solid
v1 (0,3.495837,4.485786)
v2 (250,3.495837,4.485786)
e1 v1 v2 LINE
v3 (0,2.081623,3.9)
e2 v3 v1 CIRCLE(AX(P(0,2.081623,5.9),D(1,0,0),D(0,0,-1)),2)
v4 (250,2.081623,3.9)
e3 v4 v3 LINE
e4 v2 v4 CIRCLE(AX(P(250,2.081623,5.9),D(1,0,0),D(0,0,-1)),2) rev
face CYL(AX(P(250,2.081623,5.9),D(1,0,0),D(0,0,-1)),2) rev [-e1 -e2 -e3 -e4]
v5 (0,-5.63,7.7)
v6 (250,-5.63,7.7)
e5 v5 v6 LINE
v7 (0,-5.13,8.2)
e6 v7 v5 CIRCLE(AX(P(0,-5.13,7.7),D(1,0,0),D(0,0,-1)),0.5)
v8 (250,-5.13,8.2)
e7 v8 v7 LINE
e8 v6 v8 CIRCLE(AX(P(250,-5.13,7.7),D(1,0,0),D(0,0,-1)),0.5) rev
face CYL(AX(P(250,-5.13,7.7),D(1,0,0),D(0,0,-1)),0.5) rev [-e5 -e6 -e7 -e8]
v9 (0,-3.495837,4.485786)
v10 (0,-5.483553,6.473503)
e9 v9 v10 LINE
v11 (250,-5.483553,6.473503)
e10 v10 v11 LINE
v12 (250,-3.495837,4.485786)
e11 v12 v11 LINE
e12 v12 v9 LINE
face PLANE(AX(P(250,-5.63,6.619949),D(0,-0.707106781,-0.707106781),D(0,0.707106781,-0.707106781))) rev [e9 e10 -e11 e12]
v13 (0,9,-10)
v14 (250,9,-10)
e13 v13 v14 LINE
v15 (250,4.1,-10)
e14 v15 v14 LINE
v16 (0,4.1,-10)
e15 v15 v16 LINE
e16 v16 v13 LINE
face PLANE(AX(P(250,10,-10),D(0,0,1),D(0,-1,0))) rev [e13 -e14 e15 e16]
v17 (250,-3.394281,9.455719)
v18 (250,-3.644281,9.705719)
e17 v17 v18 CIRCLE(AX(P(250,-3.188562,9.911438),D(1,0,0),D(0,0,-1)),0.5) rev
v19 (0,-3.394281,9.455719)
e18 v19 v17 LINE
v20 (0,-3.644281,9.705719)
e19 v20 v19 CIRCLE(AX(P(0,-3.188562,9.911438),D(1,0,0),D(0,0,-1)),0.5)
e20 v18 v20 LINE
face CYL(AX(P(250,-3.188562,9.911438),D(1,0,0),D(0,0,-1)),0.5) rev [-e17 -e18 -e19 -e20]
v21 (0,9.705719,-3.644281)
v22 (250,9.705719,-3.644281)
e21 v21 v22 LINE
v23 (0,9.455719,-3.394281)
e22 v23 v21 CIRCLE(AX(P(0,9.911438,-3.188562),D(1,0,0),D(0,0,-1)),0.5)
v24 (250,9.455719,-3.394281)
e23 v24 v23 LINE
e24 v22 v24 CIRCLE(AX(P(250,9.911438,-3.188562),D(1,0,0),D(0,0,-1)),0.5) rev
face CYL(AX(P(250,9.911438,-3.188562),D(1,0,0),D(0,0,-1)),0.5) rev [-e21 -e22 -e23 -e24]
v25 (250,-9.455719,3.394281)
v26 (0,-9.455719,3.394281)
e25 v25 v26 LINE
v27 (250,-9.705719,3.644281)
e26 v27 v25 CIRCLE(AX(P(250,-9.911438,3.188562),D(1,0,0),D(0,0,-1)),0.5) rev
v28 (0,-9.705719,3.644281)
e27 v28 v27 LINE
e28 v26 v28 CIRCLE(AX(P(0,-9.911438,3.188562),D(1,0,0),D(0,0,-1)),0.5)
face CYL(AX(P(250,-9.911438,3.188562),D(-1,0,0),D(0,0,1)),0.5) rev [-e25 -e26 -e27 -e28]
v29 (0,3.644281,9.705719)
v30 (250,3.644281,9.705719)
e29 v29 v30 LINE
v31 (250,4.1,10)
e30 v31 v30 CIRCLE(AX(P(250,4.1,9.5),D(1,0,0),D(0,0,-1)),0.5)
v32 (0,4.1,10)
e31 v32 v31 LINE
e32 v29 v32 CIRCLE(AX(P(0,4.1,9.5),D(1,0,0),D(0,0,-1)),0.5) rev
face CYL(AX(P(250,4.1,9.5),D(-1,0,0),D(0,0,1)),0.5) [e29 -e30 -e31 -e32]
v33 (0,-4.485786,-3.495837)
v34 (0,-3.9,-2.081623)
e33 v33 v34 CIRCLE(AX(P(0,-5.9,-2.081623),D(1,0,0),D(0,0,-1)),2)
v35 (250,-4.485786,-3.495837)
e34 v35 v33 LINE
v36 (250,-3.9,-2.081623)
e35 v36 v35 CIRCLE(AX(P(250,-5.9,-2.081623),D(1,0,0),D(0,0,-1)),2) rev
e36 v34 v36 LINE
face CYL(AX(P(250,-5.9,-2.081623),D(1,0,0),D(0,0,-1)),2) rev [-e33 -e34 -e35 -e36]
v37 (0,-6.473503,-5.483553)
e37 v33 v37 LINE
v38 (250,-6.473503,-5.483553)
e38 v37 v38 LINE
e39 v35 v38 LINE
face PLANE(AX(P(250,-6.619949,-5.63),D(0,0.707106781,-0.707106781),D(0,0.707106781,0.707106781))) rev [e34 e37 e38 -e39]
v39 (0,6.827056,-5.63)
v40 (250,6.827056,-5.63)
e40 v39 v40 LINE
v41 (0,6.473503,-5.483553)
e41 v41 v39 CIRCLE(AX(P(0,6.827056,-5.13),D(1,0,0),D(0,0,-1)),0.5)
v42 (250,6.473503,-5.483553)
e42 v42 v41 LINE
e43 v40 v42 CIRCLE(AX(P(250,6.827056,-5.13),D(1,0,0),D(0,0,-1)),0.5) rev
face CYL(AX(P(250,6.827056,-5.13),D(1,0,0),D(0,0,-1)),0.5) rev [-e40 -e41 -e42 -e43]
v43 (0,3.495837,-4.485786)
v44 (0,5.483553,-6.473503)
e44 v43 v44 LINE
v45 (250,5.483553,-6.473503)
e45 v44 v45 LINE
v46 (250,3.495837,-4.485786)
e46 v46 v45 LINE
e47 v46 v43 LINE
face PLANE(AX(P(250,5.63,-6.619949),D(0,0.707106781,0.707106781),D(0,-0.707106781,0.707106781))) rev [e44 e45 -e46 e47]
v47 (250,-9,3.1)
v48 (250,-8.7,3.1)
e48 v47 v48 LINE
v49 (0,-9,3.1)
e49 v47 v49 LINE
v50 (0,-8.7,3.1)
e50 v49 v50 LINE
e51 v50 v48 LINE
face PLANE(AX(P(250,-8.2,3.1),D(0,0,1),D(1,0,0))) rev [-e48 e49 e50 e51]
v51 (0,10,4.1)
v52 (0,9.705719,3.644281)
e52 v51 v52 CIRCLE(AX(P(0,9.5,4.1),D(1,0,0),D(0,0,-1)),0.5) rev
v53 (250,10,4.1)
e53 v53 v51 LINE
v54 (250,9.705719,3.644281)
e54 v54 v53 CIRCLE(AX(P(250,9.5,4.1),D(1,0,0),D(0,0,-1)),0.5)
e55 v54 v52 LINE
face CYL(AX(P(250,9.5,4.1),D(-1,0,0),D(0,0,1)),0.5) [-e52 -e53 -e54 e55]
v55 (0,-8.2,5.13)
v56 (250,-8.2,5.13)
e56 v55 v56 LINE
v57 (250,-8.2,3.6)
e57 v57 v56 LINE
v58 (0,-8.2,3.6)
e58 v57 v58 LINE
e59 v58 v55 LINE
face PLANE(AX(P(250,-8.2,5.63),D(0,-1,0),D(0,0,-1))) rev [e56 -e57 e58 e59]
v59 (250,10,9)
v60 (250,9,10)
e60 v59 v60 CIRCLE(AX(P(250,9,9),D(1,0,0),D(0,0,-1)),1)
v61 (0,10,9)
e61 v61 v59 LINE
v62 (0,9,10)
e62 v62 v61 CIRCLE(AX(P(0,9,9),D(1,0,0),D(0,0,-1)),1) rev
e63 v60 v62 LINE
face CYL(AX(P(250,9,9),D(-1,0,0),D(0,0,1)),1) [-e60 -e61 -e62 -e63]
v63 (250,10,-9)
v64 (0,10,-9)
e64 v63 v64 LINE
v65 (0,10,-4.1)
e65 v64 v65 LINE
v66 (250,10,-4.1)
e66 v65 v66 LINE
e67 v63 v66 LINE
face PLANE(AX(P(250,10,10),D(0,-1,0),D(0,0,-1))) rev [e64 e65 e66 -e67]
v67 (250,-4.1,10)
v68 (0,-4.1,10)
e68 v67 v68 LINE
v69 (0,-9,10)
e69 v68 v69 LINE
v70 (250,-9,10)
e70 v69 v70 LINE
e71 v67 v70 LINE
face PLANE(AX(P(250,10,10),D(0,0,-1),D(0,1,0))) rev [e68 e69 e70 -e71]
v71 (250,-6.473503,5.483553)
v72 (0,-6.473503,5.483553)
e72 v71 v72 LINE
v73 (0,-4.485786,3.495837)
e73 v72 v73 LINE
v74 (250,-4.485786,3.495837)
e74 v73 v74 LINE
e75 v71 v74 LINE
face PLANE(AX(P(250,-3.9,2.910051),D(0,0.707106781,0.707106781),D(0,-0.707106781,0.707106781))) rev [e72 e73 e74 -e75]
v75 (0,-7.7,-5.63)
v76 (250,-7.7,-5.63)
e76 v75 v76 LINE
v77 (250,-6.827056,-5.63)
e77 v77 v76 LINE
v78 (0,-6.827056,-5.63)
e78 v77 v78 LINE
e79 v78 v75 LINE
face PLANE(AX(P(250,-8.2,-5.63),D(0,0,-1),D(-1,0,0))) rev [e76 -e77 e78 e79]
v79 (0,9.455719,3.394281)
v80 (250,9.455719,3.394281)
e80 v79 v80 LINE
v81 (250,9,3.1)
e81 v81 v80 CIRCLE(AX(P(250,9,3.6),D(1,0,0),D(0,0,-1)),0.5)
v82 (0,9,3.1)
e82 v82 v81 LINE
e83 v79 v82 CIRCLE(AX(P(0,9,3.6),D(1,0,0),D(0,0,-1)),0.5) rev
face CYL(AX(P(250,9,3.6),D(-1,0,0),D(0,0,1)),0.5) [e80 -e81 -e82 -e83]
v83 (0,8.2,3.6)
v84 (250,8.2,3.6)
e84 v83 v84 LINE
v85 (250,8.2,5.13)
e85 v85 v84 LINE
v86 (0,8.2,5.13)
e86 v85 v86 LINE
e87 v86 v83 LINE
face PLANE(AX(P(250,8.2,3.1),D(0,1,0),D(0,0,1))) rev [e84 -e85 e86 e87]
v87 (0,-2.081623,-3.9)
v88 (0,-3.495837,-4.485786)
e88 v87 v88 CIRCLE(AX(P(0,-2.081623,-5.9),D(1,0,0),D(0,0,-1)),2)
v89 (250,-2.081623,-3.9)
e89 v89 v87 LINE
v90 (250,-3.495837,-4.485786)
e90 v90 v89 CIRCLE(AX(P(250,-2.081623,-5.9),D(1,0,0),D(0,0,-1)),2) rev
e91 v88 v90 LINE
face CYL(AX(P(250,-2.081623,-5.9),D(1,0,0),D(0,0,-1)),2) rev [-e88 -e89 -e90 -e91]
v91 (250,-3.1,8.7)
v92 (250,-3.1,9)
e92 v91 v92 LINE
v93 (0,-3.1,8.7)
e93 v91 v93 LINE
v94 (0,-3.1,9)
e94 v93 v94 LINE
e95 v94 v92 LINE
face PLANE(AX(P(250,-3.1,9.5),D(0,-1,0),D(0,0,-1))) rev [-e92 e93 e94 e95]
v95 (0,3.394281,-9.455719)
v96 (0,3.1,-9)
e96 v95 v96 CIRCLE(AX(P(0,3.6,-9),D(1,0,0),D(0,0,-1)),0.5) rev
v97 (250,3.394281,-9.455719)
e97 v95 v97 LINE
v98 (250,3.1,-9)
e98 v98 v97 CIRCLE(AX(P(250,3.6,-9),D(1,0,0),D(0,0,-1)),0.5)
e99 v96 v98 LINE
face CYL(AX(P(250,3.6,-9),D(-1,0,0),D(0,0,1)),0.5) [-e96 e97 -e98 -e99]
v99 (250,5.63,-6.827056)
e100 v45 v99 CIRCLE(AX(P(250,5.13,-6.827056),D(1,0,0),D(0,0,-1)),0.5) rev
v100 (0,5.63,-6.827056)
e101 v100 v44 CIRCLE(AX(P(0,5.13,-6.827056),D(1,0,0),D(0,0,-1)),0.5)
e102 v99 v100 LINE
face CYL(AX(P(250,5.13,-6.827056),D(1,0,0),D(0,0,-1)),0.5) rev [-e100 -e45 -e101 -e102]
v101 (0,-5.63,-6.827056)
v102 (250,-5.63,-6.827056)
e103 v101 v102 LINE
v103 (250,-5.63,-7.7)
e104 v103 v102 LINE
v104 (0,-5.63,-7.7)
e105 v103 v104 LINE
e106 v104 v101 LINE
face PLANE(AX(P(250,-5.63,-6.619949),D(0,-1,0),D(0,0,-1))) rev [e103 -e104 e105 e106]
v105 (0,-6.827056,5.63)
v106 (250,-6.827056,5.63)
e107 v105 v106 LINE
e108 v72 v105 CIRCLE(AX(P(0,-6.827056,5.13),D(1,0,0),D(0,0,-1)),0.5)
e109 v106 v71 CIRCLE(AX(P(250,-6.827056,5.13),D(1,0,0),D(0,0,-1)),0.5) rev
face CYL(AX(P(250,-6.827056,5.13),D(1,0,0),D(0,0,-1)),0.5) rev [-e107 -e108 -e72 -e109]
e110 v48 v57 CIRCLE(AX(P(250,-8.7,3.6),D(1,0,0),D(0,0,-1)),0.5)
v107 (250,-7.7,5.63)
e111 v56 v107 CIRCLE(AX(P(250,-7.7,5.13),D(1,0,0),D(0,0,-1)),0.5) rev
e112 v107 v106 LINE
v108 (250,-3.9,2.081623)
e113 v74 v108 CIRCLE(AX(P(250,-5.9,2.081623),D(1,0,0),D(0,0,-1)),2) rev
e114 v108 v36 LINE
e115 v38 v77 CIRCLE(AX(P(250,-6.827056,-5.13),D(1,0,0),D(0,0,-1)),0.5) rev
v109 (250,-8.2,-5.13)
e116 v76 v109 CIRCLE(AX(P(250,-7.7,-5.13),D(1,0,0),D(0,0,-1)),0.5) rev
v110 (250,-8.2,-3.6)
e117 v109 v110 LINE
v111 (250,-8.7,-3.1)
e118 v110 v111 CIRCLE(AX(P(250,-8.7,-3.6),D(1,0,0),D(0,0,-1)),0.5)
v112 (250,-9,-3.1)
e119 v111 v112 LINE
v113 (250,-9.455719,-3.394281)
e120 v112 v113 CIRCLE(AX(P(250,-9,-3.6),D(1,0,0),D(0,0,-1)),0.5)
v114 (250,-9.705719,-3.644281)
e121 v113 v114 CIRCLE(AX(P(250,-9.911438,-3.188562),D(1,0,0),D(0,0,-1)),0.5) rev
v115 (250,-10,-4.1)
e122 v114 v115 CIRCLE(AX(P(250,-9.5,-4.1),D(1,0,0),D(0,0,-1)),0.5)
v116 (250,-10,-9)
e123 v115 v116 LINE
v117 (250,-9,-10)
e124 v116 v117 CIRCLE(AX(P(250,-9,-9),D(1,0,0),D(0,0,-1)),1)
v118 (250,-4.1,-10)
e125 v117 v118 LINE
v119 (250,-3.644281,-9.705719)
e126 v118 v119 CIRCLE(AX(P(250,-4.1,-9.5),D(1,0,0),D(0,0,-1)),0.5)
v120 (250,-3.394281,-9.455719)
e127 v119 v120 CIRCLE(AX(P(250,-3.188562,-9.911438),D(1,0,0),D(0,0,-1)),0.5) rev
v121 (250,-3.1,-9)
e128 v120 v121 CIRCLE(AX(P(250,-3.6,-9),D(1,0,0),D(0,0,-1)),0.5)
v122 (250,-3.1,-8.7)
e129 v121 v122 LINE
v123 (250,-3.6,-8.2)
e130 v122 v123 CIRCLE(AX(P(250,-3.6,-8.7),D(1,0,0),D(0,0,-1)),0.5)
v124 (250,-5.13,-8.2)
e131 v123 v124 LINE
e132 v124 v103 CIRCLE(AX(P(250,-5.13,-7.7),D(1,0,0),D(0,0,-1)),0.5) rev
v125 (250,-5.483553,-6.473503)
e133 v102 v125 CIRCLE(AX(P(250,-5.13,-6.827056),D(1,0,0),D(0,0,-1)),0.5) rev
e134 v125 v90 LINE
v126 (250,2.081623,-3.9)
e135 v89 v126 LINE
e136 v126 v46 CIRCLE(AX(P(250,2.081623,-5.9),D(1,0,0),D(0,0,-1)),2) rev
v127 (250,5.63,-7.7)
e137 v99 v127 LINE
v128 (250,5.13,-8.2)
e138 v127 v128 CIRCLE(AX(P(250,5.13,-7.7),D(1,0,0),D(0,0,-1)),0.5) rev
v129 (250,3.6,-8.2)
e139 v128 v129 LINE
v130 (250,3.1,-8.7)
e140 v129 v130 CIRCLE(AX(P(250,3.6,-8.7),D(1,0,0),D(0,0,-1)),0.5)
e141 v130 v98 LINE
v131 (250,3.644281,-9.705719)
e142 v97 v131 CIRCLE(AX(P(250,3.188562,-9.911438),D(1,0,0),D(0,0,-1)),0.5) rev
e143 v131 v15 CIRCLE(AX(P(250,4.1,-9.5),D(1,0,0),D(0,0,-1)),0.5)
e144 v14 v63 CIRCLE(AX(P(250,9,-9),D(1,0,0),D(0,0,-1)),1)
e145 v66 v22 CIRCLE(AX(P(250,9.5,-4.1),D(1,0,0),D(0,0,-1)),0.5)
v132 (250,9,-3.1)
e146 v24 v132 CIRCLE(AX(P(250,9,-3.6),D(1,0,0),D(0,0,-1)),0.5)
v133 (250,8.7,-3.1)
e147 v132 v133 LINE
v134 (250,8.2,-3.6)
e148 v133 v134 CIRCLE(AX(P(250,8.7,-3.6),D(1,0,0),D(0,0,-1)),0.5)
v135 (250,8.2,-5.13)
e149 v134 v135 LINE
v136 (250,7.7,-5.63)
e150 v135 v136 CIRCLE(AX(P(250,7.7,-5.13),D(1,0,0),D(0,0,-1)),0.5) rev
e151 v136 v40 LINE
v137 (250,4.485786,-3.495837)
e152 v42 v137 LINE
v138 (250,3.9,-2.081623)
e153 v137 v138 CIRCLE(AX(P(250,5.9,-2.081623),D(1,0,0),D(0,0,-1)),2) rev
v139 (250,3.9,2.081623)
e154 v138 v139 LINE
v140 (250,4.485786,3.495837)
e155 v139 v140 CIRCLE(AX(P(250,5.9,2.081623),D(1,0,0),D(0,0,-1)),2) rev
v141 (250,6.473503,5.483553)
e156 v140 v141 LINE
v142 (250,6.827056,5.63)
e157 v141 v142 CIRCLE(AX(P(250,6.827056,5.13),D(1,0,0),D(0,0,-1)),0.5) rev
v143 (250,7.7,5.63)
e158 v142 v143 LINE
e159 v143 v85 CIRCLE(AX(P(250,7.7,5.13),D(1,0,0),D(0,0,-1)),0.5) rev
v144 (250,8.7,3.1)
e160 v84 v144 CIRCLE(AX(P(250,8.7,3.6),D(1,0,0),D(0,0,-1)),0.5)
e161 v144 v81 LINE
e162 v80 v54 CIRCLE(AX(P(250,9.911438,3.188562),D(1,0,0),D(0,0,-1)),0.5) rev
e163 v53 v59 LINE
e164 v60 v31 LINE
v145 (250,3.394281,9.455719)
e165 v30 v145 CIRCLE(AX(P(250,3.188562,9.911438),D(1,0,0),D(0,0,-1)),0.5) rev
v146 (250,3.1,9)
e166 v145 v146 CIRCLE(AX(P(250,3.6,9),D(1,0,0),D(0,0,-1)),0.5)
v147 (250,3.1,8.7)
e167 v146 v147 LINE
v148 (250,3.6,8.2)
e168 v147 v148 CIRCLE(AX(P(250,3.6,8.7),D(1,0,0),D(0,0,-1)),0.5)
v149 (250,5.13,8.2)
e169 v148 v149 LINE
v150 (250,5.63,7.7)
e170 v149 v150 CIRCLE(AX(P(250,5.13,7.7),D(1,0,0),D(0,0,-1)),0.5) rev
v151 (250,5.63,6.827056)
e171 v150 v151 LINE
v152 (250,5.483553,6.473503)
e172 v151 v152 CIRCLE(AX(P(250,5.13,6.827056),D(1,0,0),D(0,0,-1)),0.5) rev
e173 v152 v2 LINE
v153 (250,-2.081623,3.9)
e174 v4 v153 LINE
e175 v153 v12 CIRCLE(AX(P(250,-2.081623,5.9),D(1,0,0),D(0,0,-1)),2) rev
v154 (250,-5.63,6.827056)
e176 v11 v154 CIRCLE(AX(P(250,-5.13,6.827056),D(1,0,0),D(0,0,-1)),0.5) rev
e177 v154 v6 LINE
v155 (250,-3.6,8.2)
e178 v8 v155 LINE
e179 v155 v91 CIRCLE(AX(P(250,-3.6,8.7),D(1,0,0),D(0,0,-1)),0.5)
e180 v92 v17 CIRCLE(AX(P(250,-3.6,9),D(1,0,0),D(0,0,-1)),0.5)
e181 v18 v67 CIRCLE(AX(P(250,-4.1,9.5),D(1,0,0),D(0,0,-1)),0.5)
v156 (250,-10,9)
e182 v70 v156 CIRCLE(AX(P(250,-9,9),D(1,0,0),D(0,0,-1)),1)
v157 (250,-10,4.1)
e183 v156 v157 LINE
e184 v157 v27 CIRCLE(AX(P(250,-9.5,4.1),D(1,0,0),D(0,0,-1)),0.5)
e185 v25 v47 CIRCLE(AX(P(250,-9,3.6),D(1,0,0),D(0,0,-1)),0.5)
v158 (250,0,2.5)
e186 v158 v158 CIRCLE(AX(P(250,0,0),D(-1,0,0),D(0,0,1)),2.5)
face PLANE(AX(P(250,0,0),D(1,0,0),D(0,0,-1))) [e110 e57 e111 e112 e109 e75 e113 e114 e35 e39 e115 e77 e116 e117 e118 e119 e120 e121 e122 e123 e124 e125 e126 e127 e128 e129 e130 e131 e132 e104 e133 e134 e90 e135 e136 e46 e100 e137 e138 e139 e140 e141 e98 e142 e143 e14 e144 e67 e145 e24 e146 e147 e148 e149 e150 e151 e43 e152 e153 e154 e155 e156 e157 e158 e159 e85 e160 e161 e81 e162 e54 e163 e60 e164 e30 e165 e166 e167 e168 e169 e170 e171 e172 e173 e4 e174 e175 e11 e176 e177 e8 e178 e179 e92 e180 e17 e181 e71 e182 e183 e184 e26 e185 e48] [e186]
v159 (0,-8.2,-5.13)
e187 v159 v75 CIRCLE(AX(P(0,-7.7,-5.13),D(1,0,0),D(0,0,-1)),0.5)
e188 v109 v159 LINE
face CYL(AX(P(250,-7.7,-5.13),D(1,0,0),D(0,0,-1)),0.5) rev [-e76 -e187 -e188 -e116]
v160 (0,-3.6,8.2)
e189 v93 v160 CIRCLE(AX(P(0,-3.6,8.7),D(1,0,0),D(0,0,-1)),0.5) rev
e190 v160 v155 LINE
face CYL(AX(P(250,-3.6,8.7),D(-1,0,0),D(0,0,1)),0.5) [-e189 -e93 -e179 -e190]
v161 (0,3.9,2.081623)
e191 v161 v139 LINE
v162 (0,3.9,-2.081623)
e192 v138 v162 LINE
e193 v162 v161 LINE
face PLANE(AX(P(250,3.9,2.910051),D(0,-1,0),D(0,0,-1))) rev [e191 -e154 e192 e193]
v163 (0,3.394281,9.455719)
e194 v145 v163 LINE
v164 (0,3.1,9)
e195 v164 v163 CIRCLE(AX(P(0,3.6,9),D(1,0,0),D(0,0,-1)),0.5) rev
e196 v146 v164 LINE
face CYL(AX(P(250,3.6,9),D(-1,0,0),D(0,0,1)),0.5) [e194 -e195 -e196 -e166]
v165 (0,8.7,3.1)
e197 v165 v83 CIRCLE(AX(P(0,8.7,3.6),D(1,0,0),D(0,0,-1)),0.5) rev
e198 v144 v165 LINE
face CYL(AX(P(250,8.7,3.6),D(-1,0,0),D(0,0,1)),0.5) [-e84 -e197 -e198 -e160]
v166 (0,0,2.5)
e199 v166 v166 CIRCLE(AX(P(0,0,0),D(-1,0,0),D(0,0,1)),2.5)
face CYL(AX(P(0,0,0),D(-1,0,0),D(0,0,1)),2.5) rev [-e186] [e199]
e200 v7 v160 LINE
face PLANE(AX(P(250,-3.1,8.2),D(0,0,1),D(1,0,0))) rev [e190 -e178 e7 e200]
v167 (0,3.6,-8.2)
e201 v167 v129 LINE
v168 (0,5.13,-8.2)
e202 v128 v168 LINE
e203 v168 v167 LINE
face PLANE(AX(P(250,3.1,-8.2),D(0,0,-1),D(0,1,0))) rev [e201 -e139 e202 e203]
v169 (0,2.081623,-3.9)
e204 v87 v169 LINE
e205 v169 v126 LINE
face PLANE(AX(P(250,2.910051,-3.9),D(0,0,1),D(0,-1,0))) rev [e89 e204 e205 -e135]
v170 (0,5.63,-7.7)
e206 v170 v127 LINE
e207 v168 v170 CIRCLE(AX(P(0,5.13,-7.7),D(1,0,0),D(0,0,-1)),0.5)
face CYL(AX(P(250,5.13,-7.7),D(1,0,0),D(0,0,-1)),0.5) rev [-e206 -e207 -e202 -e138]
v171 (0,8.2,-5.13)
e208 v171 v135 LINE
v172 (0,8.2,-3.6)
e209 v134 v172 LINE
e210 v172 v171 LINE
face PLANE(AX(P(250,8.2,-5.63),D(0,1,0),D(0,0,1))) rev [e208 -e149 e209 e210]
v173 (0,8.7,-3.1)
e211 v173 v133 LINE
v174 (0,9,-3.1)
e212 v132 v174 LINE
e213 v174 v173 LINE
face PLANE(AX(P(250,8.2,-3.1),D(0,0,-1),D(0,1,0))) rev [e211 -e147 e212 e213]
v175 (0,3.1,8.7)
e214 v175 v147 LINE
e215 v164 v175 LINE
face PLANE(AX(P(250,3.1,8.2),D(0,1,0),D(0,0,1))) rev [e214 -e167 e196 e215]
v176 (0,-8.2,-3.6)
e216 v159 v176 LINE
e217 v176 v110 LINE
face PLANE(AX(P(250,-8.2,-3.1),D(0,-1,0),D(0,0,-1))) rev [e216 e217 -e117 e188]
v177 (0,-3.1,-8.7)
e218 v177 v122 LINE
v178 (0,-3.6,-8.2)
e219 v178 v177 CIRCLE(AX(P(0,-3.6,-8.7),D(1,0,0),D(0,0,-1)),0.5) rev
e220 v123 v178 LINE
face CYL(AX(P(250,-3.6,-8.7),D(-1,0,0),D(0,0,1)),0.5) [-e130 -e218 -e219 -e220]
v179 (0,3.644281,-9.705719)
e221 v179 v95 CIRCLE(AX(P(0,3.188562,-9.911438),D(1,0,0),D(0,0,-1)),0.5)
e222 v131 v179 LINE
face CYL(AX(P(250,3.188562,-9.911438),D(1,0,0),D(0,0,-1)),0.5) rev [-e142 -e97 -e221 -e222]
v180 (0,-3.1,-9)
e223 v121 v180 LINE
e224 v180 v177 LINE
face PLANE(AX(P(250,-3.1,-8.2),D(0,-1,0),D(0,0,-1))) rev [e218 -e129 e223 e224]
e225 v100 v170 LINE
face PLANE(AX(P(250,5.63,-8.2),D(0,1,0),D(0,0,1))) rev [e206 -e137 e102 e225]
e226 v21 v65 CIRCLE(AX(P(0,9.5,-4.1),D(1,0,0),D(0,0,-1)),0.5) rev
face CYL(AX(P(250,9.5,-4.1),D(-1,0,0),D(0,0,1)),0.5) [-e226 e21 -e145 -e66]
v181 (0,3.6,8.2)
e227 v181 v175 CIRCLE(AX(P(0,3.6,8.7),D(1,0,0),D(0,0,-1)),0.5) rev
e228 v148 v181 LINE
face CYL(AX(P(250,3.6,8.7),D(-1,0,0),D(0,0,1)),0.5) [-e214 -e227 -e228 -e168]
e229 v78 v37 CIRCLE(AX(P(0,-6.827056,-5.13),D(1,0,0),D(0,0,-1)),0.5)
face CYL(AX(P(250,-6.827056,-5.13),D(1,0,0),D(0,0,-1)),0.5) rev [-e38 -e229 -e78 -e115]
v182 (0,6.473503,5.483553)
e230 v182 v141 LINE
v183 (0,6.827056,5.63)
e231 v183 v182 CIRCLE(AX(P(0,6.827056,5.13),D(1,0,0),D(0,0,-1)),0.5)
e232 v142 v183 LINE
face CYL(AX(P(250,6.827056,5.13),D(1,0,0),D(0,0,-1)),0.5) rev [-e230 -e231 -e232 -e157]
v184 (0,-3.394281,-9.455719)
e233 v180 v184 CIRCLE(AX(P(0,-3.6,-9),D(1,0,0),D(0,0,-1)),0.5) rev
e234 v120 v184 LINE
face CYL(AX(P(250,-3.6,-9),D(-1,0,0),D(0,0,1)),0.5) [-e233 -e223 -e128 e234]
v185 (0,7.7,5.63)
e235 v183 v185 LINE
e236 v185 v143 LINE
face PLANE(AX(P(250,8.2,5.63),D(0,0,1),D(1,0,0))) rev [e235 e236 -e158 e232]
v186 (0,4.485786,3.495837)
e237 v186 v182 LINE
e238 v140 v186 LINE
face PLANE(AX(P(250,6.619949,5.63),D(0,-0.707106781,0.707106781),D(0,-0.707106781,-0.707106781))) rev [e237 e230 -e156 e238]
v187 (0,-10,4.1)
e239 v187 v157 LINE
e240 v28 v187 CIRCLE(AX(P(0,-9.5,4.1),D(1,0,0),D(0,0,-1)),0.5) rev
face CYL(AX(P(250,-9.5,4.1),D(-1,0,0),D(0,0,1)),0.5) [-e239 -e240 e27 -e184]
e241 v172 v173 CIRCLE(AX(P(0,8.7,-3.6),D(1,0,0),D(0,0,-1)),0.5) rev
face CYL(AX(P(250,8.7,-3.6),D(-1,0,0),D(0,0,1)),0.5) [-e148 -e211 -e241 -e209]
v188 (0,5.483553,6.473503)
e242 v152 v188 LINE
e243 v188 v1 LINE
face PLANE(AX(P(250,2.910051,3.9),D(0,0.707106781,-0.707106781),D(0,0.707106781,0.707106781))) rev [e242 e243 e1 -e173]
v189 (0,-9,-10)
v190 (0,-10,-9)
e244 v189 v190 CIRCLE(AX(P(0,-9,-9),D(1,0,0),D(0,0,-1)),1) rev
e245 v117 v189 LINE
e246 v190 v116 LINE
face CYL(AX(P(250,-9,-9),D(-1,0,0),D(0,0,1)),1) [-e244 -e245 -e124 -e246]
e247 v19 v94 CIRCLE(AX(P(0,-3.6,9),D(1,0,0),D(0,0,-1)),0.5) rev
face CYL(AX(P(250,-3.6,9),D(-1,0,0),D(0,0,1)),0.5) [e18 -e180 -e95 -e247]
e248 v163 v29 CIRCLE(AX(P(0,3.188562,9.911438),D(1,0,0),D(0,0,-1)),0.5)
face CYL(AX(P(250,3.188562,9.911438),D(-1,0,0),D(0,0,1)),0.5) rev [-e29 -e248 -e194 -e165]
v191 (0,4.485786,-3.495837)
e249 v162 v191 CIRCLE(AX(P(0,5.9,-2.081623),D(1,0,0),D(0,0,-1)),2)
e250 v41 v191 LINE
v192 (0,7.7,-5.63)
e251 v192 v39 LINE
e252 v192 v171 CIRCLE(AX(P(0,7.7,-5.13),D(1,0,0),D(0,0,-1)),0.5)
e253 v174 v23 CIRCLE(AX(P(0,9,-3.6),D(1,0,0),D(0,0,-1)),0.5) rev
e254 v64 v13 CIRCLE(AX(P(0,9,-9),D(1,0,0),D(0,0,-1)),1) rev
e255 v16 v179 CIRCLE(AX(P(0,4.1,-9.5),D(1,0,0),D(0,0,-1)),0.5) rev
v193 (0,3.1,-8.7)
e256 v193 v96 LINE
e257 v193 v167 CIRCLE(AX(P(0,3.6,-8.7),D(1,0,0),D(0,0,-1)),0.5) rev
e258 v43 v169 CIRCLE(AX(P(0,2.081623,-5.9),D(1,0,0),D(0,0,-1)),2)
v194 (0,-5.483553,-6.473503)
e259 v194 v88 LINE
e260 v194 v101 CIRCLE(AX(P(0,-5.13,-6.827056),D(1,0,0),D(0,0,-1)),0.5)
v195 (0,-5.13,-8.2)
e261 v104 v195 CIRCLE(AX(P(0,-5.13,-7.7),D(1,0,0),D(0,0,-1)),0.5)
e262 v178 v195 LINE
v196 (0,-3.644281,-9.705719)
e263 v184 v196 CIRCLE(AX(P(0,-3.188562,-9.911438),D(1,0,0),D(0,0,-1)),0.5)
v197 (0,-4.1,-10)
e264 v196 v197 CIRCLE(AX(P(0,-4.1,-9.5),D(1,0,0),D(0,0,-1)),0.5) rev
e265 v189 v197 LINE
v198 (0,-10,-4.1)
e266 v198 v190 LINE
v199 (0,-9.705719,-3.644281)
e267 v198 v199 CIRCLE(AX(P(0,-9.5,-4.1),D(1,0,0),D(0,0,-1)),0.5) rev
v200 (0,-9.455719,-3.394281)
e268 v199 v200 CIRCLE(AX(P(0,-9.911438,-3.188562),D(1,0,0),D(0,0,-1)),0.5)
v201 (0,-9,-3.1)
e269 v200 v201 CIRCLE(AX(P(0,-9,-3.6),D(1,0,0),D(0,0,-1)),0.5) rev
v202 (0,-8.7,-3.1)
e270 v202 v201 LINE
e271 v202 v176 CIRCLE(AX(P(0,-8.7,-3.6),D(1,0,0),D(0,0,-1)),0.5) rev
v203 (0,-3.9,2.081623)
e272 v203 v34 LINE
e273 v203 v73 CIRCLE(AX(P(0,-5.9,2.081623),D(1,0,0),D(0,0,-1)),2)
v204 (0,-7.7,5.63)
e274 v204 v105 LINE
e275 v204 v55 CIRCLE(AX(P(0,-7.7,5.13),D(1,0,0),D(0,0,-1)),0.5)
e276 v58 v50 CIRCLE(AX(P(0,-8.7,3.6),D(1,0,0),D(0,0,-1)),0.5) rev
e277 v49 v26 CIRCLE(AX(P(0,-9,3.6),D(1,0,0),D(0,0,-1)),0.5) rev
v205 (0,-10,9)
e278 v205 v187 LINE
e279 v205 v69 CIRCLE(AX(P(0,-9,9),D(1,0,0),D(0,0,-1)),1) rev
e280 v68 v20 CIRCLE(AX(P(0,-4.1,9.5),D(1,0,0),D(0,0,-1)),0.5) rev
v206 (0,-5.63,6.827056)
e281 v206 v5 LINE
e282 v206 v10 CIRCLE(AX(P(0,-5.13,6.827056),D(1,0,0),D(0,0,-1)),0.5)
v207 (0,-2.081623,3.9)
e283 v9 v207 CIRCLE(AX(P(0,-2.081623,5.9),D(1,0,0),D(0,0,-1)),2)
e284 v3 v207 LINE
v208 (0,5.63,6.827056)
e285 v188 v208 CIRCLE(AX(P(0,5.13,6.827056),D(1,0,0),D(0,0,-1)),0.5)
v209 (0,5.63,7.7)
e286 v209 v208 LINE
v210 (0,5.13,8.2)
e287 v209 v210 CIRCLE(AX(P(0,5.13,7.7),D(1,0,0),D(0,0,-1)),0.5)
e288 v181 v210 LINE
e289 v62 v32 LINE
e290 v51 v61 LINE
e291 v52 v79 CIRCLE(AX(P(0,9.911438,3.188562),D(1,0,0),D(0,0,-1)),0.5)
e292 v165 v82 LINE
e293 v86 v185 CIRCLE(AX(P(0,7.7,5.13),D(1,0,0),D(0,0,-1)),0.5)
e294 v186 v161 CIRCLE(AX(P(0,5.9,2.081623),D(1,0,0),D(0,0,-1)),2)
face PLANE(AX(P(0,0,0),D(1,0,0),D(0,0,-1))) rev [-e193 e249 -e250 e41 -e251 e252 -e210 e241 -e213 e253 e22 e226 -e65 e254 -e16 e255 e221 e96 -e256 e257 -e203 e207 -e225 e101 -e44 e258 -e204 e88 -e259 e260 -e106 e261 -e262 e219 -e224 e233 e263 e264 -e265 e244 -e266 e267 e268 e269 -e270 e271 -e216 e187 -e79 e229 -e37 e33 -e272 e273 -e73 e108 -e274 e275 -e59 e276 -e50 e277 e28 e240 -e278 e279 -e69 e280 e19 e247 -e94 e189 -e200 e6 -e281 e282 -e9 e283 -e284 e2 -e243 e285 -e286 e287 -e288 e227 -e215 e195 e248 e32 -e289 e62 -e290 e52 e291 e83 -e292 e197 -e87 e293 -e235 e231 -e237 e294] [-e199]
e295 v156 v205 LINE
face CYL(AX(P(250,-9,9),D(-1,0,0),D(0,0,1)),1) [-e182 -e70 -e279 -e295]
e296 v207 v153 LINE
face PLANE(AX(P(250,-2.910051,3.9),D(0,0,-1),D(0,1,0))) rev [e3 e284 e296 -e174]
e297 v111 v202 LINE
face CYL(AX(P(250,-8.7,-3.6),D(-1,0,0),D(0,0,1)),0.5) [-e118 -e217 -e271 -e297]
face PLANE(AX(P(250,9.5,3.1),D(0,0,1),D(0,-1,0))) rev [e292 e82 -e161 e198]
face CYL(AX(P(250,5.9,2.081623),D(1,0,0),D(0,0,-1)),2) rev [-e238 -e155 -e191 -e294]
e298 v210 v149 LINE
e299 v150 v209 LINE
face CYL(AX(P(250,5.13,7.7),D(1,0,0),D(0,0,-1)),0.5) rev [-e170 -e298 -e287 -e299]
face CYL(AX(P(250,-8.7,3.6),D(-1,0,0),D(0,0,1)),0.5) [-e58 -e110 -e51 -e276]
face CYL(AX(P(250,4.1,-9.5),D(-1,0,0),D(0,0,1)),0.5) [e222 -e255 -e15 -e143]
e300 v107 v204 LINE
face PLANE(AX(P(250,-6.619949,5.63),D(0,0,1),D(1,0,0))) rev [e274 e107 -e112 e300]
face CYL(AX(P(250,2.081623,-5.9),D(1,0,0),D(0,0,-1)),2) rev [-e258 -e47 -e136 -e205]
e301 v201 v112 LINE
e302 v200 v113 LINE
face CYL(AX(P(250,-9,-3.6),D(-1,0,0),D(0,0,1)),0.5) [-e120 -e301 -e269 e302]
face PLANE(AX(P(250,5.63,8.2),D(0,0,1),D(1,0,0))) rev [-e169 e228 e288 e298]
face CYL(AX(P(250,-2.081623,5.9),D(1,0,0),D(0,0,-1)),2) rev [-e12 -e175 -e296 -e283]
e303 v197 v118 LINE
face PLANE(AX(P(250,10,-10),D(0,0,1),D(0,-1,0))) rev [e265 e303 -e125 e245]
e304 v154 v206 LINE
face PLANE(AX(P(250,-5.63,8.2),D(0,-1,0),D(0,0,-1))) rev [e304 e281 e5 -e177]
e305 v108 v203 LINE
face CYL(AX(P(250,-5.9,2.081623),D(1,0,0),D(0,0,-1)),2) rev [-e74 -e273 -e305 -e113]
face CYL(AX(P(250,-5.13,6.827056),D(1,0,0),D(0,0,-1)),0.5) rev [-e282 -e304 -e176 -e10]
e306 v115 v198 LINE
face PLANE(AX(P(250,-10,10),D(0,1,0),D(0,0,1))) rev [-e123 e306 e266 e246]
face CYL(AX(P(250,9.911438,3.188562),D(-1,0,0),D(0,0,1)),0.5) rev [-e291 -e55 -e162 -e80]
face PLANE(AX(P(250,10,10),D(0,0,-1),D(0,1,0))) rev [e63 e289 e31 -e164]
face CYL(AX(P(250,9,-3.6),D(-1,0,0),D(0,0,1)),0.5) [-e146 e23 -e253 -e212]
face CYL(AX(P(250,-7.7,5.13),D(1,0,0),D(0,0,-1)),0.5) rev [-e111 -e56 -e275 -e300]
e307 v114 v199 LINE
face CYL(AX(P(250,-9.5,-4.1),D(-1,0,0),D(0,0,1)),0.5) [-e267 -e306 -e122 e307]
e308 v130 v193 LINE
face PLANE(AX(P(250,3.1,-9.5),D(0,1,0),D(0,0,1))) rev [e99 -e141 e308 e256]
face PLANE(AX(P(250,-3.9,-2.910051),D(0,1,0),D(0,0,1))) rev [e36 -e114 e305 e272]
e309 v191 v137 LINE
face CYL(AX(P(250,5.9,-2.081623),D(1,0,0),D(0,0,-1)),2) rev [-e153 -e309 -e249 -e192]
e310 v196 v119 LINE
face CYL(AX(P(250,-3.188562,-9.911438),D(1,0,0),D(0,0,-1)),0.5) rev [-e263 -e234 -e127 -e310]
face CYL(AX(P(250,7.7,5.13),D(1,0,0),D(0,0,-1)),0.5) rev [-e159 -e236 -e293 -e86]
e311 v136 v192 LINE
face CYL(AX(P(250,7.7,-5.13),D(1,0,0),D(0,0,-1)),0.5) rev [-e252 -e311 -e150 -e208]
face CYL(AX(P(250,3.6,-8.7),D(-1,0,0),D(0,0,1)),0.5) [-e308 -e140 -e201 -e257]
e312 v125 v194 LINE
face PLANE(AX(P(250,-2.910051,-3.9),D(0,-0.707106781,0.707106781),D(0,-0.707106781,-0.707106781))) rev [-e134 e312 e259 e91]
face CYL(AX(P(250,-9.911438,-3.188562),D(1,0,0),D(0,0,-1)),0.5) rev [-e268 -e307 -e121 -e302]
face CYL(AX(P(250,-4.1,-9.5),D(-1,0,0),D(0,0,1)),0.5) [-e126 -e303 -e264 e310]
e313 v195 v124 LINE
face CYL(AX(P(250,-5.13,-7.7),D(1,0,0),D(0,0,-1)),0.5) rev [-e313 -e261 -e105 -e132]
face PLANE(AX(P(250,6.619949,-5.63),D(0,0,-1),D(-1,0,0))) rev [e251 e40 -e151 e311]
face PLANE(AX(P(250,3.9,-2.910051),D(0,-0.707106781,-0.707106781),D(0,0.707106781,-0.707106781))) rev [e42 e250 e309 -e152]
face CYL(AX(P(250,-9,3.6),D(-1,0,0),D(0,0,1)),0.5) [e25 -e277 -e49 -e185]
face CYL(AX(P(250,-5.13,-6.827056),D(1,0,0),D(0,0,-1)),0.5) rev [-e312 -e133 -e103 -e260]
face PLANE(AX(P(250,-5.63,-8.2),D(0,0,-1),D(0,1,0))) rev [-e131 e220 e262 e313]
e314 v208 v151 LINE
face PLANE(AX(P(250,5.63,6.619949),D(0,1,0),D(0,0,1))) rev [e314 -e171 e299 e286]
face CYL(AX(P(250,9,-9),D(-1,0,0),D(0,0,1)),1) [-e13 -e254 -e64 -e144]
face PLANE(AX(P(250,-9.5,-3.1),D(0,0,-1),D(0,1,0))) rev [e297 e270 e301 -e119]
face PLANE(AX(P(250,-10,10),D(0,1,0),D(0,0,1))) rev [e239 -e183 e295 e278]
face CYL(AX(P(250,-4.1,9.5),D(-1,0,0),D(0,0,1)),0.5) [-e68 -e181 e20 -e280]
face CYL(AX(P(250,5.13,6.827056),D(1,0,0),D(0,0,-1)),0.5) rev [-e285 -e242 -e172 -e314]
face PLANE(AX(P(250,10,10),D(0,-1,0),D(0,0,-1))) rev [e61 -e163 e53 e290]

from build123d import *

# Parameters (mm, degrees)
SKETCH1_W                = 20
SKETCH1_H                = 20
BOSS_EXTRUDE1_DEPTH      = 250
FILLET1_R                = 1
CUT_EXTRUDE1_DEPTH       = 251.399680511
F_5_0_5_DIAMETER_HOLE1_D = 5
FILLET2_R                = 2
FILLET3_R                = 0.5
FILLET4_R                = 0.5
FILLET5_R                = 0.5


with BuildPart() as part:
    # Sketch1 → Boss-Extrude1 (new body)
    with BuildSketch(Plane(origin=(0, 0, 0), x_dir=(0, 0, -1), z_dir=(1, 0, 0))):
        Rectangle(SKETCH1_W, SKETCH1_H)
    extrude(amount=BOSS_EXTRUDE1_DEPTH)

    # Fillet1
    fillet1_edges = [part.edges().sort_by_distance(p)[0] for p in [
        (125, 10, 10),
        (125, 10, -10),
        (125, -10, -10),
        (125, -10, 10),
    ]]
    fillet(fillet1_edges, radius=FILLET1_R)

    # Sketch3 → Cut-Extrude1 (cut, through all)
    with BuildSketch(Plane.ZY):
        Polygon((-3.6, 10), (3.6, 10), (3.6, 9.5), (3.1, 9.5), (3.1, 8.2), (5.63, 8.2), (5.63, 6.619949494), (2.910050506, 3.9), (-2.910050506, 3.9), (-5.63, 6.619949494), (-5.63, 8.2), (-3.1, 8.2), (-3.1, 9.5), (-3.6, 9.5), align=None)
        Polygon((10, 3.6), (10, -3.6), (9.5, -3.6), (9.5, -3.1), (8.2, -3.1), (8.2, -5.63), (6.619949494, -5.63), (3.9, -2.910050506), (3.9, 2.910050506), (6.619949494, 5.63), (8.2, 5.63), (8.2, 3.1), (9.5, 3.1), (9.5, 3.6), align=None)
        Polygon((3.6, -10), (-3.6, -10), (-3.6, -9.5), (-3.1, -9.5), (-3.1, -8.2), (-5.63, -8.2), (-5.63, -6.619949494), (-2.910050506, -3.9), (2.910050506, -3.9), (5.63, -6.619949494), (5.63, -8.2), (3.1, -8.2), (3.1, -9.5), (3.6, -9.5), align=None)
        Polygon((-10, -3.6), (-10, 3.6), (-9.5, 3.6), (-9.5, 3.1), (-8.2, 3.1), (-8.2, 5.63), (-6.619949494, 5.63), (-3.9, 2.910050506), (-3.9, -2.910050506), (-6.619949494, -5.63), (-8.2, -5.63), (-8.2, -3.1), (-9.5, -3.1), (-9.5, -3.6), align=None)
    extrude(amount=-CUT_EXTRUDE1_DEPTH, mode=Mode.SUBTRACT)

    # Ø5.0 (5) Diameter Hole1 (through all)
    with Locations(Plane.ZY):
        with Locations((0, 0)):
            Hole(F_5_0_5_DIAMETER_HOLE1_D / 2)

    # Fillet2
    fillet2_edges = [part.edges().sort_by_distance(p)[0] for p in [
        (125, -3.9, -2.910050506),
        (125, -3.9, 2.910050506),
        (125, 2.910050506, -3.9),
        (125, -2.910050506, -3.9),
        (125, -2.910050506, 3.9),
        (125, 2.910050506, 3.9),
        (125, 3.9, 2.910050506),
        (125, 3.9, -2.910050506),
    ]]
    fillet(fillet2_edges, radius=FILLET2_R)

    # Fillet3
    fillet3_edges = [part.edges().sort_by_distance(p)[0] for p in [
        (125, 3.6, -10),
        (125, 3.1, -9.5),
        (125, 3.1, -8.2),
        (125, 5.63, -8.2),
        (125, 5.63, -6.619949494),
        (125, 3.6, 10),
        (125, 3.1, 9.5),
        (125, 3.1, 8.2),
        (125, 5.63, 8.2),
        (125, 5.63, 6.619949494),
        (125, 6.619949494, 5.63),
        (125, 8.2, 5.63),
        (125, 8.2, 3.1),
        (125, 9.5, 3.1),
        (125, 10, 3.6),
        (125, 9.5, -3.1),
        (125, 10, -3.6),
        (125, 8.2, -3.1),
        (125, 8.2, -5.63),
        (125, 6.619949494, -5.63),
    ]]
    fillet(fillet3_edges, radius=FILLET3_R - 0.0001)  # a hair under: the kernel refuses the full size

    # Fillet4
    fillet4_edges = [part.edges().sort_by_distance(p)[0] for p in [
        (125, -3.6, 10),
        (125, -3.1, 9.5),
        (125, -3.1, 8.2),
        (125, -5.63, 8.2),
        (125, -5.63, 6.619949494),
        (125, -6.619949494, 5.63),
        (125, -8.2, 5.63),
        (125, -8.2, 3.1),
        (125, -10, 3.6),
        (125, -9.5, 3.1),
        (125, -10, -3.6),
        (125, -9.5, -3.1),
        (125, -8.2, -3.1),
        (125, -8.2, -5.63),
        (125, -6.619949494, -5.63),
        (125, -5.63, -6.619949494),
        (125, -5.63, -8.2),
        (125, -3.1, -8.2),
        (125, -3.1, -9.5),
        (125, -3.6, -10),
    ]]
    fillet(fillet4_edges, radius=FILLET4_R - 0.0001)  # a hair under: the kernel refuses the full size

    # Fillet5
    fillet5_edges = [part.edges().sort_by_distance(p)[0] for p in [
        (125, 3.6, 9.5),
        (125, 9.5, 3.6),
        (125, 9.5, -3.6),
        (125, 3.6, -9.5),
        (125, -3.6, 9.5),
        (125, -9.5, 3.6),
        (125, -9.5, -3.6),
        (125, -3.6, -9.5),
    ]]
    fillet(fillet5_edges, radius=FILLET5_R)


solid = part.part
